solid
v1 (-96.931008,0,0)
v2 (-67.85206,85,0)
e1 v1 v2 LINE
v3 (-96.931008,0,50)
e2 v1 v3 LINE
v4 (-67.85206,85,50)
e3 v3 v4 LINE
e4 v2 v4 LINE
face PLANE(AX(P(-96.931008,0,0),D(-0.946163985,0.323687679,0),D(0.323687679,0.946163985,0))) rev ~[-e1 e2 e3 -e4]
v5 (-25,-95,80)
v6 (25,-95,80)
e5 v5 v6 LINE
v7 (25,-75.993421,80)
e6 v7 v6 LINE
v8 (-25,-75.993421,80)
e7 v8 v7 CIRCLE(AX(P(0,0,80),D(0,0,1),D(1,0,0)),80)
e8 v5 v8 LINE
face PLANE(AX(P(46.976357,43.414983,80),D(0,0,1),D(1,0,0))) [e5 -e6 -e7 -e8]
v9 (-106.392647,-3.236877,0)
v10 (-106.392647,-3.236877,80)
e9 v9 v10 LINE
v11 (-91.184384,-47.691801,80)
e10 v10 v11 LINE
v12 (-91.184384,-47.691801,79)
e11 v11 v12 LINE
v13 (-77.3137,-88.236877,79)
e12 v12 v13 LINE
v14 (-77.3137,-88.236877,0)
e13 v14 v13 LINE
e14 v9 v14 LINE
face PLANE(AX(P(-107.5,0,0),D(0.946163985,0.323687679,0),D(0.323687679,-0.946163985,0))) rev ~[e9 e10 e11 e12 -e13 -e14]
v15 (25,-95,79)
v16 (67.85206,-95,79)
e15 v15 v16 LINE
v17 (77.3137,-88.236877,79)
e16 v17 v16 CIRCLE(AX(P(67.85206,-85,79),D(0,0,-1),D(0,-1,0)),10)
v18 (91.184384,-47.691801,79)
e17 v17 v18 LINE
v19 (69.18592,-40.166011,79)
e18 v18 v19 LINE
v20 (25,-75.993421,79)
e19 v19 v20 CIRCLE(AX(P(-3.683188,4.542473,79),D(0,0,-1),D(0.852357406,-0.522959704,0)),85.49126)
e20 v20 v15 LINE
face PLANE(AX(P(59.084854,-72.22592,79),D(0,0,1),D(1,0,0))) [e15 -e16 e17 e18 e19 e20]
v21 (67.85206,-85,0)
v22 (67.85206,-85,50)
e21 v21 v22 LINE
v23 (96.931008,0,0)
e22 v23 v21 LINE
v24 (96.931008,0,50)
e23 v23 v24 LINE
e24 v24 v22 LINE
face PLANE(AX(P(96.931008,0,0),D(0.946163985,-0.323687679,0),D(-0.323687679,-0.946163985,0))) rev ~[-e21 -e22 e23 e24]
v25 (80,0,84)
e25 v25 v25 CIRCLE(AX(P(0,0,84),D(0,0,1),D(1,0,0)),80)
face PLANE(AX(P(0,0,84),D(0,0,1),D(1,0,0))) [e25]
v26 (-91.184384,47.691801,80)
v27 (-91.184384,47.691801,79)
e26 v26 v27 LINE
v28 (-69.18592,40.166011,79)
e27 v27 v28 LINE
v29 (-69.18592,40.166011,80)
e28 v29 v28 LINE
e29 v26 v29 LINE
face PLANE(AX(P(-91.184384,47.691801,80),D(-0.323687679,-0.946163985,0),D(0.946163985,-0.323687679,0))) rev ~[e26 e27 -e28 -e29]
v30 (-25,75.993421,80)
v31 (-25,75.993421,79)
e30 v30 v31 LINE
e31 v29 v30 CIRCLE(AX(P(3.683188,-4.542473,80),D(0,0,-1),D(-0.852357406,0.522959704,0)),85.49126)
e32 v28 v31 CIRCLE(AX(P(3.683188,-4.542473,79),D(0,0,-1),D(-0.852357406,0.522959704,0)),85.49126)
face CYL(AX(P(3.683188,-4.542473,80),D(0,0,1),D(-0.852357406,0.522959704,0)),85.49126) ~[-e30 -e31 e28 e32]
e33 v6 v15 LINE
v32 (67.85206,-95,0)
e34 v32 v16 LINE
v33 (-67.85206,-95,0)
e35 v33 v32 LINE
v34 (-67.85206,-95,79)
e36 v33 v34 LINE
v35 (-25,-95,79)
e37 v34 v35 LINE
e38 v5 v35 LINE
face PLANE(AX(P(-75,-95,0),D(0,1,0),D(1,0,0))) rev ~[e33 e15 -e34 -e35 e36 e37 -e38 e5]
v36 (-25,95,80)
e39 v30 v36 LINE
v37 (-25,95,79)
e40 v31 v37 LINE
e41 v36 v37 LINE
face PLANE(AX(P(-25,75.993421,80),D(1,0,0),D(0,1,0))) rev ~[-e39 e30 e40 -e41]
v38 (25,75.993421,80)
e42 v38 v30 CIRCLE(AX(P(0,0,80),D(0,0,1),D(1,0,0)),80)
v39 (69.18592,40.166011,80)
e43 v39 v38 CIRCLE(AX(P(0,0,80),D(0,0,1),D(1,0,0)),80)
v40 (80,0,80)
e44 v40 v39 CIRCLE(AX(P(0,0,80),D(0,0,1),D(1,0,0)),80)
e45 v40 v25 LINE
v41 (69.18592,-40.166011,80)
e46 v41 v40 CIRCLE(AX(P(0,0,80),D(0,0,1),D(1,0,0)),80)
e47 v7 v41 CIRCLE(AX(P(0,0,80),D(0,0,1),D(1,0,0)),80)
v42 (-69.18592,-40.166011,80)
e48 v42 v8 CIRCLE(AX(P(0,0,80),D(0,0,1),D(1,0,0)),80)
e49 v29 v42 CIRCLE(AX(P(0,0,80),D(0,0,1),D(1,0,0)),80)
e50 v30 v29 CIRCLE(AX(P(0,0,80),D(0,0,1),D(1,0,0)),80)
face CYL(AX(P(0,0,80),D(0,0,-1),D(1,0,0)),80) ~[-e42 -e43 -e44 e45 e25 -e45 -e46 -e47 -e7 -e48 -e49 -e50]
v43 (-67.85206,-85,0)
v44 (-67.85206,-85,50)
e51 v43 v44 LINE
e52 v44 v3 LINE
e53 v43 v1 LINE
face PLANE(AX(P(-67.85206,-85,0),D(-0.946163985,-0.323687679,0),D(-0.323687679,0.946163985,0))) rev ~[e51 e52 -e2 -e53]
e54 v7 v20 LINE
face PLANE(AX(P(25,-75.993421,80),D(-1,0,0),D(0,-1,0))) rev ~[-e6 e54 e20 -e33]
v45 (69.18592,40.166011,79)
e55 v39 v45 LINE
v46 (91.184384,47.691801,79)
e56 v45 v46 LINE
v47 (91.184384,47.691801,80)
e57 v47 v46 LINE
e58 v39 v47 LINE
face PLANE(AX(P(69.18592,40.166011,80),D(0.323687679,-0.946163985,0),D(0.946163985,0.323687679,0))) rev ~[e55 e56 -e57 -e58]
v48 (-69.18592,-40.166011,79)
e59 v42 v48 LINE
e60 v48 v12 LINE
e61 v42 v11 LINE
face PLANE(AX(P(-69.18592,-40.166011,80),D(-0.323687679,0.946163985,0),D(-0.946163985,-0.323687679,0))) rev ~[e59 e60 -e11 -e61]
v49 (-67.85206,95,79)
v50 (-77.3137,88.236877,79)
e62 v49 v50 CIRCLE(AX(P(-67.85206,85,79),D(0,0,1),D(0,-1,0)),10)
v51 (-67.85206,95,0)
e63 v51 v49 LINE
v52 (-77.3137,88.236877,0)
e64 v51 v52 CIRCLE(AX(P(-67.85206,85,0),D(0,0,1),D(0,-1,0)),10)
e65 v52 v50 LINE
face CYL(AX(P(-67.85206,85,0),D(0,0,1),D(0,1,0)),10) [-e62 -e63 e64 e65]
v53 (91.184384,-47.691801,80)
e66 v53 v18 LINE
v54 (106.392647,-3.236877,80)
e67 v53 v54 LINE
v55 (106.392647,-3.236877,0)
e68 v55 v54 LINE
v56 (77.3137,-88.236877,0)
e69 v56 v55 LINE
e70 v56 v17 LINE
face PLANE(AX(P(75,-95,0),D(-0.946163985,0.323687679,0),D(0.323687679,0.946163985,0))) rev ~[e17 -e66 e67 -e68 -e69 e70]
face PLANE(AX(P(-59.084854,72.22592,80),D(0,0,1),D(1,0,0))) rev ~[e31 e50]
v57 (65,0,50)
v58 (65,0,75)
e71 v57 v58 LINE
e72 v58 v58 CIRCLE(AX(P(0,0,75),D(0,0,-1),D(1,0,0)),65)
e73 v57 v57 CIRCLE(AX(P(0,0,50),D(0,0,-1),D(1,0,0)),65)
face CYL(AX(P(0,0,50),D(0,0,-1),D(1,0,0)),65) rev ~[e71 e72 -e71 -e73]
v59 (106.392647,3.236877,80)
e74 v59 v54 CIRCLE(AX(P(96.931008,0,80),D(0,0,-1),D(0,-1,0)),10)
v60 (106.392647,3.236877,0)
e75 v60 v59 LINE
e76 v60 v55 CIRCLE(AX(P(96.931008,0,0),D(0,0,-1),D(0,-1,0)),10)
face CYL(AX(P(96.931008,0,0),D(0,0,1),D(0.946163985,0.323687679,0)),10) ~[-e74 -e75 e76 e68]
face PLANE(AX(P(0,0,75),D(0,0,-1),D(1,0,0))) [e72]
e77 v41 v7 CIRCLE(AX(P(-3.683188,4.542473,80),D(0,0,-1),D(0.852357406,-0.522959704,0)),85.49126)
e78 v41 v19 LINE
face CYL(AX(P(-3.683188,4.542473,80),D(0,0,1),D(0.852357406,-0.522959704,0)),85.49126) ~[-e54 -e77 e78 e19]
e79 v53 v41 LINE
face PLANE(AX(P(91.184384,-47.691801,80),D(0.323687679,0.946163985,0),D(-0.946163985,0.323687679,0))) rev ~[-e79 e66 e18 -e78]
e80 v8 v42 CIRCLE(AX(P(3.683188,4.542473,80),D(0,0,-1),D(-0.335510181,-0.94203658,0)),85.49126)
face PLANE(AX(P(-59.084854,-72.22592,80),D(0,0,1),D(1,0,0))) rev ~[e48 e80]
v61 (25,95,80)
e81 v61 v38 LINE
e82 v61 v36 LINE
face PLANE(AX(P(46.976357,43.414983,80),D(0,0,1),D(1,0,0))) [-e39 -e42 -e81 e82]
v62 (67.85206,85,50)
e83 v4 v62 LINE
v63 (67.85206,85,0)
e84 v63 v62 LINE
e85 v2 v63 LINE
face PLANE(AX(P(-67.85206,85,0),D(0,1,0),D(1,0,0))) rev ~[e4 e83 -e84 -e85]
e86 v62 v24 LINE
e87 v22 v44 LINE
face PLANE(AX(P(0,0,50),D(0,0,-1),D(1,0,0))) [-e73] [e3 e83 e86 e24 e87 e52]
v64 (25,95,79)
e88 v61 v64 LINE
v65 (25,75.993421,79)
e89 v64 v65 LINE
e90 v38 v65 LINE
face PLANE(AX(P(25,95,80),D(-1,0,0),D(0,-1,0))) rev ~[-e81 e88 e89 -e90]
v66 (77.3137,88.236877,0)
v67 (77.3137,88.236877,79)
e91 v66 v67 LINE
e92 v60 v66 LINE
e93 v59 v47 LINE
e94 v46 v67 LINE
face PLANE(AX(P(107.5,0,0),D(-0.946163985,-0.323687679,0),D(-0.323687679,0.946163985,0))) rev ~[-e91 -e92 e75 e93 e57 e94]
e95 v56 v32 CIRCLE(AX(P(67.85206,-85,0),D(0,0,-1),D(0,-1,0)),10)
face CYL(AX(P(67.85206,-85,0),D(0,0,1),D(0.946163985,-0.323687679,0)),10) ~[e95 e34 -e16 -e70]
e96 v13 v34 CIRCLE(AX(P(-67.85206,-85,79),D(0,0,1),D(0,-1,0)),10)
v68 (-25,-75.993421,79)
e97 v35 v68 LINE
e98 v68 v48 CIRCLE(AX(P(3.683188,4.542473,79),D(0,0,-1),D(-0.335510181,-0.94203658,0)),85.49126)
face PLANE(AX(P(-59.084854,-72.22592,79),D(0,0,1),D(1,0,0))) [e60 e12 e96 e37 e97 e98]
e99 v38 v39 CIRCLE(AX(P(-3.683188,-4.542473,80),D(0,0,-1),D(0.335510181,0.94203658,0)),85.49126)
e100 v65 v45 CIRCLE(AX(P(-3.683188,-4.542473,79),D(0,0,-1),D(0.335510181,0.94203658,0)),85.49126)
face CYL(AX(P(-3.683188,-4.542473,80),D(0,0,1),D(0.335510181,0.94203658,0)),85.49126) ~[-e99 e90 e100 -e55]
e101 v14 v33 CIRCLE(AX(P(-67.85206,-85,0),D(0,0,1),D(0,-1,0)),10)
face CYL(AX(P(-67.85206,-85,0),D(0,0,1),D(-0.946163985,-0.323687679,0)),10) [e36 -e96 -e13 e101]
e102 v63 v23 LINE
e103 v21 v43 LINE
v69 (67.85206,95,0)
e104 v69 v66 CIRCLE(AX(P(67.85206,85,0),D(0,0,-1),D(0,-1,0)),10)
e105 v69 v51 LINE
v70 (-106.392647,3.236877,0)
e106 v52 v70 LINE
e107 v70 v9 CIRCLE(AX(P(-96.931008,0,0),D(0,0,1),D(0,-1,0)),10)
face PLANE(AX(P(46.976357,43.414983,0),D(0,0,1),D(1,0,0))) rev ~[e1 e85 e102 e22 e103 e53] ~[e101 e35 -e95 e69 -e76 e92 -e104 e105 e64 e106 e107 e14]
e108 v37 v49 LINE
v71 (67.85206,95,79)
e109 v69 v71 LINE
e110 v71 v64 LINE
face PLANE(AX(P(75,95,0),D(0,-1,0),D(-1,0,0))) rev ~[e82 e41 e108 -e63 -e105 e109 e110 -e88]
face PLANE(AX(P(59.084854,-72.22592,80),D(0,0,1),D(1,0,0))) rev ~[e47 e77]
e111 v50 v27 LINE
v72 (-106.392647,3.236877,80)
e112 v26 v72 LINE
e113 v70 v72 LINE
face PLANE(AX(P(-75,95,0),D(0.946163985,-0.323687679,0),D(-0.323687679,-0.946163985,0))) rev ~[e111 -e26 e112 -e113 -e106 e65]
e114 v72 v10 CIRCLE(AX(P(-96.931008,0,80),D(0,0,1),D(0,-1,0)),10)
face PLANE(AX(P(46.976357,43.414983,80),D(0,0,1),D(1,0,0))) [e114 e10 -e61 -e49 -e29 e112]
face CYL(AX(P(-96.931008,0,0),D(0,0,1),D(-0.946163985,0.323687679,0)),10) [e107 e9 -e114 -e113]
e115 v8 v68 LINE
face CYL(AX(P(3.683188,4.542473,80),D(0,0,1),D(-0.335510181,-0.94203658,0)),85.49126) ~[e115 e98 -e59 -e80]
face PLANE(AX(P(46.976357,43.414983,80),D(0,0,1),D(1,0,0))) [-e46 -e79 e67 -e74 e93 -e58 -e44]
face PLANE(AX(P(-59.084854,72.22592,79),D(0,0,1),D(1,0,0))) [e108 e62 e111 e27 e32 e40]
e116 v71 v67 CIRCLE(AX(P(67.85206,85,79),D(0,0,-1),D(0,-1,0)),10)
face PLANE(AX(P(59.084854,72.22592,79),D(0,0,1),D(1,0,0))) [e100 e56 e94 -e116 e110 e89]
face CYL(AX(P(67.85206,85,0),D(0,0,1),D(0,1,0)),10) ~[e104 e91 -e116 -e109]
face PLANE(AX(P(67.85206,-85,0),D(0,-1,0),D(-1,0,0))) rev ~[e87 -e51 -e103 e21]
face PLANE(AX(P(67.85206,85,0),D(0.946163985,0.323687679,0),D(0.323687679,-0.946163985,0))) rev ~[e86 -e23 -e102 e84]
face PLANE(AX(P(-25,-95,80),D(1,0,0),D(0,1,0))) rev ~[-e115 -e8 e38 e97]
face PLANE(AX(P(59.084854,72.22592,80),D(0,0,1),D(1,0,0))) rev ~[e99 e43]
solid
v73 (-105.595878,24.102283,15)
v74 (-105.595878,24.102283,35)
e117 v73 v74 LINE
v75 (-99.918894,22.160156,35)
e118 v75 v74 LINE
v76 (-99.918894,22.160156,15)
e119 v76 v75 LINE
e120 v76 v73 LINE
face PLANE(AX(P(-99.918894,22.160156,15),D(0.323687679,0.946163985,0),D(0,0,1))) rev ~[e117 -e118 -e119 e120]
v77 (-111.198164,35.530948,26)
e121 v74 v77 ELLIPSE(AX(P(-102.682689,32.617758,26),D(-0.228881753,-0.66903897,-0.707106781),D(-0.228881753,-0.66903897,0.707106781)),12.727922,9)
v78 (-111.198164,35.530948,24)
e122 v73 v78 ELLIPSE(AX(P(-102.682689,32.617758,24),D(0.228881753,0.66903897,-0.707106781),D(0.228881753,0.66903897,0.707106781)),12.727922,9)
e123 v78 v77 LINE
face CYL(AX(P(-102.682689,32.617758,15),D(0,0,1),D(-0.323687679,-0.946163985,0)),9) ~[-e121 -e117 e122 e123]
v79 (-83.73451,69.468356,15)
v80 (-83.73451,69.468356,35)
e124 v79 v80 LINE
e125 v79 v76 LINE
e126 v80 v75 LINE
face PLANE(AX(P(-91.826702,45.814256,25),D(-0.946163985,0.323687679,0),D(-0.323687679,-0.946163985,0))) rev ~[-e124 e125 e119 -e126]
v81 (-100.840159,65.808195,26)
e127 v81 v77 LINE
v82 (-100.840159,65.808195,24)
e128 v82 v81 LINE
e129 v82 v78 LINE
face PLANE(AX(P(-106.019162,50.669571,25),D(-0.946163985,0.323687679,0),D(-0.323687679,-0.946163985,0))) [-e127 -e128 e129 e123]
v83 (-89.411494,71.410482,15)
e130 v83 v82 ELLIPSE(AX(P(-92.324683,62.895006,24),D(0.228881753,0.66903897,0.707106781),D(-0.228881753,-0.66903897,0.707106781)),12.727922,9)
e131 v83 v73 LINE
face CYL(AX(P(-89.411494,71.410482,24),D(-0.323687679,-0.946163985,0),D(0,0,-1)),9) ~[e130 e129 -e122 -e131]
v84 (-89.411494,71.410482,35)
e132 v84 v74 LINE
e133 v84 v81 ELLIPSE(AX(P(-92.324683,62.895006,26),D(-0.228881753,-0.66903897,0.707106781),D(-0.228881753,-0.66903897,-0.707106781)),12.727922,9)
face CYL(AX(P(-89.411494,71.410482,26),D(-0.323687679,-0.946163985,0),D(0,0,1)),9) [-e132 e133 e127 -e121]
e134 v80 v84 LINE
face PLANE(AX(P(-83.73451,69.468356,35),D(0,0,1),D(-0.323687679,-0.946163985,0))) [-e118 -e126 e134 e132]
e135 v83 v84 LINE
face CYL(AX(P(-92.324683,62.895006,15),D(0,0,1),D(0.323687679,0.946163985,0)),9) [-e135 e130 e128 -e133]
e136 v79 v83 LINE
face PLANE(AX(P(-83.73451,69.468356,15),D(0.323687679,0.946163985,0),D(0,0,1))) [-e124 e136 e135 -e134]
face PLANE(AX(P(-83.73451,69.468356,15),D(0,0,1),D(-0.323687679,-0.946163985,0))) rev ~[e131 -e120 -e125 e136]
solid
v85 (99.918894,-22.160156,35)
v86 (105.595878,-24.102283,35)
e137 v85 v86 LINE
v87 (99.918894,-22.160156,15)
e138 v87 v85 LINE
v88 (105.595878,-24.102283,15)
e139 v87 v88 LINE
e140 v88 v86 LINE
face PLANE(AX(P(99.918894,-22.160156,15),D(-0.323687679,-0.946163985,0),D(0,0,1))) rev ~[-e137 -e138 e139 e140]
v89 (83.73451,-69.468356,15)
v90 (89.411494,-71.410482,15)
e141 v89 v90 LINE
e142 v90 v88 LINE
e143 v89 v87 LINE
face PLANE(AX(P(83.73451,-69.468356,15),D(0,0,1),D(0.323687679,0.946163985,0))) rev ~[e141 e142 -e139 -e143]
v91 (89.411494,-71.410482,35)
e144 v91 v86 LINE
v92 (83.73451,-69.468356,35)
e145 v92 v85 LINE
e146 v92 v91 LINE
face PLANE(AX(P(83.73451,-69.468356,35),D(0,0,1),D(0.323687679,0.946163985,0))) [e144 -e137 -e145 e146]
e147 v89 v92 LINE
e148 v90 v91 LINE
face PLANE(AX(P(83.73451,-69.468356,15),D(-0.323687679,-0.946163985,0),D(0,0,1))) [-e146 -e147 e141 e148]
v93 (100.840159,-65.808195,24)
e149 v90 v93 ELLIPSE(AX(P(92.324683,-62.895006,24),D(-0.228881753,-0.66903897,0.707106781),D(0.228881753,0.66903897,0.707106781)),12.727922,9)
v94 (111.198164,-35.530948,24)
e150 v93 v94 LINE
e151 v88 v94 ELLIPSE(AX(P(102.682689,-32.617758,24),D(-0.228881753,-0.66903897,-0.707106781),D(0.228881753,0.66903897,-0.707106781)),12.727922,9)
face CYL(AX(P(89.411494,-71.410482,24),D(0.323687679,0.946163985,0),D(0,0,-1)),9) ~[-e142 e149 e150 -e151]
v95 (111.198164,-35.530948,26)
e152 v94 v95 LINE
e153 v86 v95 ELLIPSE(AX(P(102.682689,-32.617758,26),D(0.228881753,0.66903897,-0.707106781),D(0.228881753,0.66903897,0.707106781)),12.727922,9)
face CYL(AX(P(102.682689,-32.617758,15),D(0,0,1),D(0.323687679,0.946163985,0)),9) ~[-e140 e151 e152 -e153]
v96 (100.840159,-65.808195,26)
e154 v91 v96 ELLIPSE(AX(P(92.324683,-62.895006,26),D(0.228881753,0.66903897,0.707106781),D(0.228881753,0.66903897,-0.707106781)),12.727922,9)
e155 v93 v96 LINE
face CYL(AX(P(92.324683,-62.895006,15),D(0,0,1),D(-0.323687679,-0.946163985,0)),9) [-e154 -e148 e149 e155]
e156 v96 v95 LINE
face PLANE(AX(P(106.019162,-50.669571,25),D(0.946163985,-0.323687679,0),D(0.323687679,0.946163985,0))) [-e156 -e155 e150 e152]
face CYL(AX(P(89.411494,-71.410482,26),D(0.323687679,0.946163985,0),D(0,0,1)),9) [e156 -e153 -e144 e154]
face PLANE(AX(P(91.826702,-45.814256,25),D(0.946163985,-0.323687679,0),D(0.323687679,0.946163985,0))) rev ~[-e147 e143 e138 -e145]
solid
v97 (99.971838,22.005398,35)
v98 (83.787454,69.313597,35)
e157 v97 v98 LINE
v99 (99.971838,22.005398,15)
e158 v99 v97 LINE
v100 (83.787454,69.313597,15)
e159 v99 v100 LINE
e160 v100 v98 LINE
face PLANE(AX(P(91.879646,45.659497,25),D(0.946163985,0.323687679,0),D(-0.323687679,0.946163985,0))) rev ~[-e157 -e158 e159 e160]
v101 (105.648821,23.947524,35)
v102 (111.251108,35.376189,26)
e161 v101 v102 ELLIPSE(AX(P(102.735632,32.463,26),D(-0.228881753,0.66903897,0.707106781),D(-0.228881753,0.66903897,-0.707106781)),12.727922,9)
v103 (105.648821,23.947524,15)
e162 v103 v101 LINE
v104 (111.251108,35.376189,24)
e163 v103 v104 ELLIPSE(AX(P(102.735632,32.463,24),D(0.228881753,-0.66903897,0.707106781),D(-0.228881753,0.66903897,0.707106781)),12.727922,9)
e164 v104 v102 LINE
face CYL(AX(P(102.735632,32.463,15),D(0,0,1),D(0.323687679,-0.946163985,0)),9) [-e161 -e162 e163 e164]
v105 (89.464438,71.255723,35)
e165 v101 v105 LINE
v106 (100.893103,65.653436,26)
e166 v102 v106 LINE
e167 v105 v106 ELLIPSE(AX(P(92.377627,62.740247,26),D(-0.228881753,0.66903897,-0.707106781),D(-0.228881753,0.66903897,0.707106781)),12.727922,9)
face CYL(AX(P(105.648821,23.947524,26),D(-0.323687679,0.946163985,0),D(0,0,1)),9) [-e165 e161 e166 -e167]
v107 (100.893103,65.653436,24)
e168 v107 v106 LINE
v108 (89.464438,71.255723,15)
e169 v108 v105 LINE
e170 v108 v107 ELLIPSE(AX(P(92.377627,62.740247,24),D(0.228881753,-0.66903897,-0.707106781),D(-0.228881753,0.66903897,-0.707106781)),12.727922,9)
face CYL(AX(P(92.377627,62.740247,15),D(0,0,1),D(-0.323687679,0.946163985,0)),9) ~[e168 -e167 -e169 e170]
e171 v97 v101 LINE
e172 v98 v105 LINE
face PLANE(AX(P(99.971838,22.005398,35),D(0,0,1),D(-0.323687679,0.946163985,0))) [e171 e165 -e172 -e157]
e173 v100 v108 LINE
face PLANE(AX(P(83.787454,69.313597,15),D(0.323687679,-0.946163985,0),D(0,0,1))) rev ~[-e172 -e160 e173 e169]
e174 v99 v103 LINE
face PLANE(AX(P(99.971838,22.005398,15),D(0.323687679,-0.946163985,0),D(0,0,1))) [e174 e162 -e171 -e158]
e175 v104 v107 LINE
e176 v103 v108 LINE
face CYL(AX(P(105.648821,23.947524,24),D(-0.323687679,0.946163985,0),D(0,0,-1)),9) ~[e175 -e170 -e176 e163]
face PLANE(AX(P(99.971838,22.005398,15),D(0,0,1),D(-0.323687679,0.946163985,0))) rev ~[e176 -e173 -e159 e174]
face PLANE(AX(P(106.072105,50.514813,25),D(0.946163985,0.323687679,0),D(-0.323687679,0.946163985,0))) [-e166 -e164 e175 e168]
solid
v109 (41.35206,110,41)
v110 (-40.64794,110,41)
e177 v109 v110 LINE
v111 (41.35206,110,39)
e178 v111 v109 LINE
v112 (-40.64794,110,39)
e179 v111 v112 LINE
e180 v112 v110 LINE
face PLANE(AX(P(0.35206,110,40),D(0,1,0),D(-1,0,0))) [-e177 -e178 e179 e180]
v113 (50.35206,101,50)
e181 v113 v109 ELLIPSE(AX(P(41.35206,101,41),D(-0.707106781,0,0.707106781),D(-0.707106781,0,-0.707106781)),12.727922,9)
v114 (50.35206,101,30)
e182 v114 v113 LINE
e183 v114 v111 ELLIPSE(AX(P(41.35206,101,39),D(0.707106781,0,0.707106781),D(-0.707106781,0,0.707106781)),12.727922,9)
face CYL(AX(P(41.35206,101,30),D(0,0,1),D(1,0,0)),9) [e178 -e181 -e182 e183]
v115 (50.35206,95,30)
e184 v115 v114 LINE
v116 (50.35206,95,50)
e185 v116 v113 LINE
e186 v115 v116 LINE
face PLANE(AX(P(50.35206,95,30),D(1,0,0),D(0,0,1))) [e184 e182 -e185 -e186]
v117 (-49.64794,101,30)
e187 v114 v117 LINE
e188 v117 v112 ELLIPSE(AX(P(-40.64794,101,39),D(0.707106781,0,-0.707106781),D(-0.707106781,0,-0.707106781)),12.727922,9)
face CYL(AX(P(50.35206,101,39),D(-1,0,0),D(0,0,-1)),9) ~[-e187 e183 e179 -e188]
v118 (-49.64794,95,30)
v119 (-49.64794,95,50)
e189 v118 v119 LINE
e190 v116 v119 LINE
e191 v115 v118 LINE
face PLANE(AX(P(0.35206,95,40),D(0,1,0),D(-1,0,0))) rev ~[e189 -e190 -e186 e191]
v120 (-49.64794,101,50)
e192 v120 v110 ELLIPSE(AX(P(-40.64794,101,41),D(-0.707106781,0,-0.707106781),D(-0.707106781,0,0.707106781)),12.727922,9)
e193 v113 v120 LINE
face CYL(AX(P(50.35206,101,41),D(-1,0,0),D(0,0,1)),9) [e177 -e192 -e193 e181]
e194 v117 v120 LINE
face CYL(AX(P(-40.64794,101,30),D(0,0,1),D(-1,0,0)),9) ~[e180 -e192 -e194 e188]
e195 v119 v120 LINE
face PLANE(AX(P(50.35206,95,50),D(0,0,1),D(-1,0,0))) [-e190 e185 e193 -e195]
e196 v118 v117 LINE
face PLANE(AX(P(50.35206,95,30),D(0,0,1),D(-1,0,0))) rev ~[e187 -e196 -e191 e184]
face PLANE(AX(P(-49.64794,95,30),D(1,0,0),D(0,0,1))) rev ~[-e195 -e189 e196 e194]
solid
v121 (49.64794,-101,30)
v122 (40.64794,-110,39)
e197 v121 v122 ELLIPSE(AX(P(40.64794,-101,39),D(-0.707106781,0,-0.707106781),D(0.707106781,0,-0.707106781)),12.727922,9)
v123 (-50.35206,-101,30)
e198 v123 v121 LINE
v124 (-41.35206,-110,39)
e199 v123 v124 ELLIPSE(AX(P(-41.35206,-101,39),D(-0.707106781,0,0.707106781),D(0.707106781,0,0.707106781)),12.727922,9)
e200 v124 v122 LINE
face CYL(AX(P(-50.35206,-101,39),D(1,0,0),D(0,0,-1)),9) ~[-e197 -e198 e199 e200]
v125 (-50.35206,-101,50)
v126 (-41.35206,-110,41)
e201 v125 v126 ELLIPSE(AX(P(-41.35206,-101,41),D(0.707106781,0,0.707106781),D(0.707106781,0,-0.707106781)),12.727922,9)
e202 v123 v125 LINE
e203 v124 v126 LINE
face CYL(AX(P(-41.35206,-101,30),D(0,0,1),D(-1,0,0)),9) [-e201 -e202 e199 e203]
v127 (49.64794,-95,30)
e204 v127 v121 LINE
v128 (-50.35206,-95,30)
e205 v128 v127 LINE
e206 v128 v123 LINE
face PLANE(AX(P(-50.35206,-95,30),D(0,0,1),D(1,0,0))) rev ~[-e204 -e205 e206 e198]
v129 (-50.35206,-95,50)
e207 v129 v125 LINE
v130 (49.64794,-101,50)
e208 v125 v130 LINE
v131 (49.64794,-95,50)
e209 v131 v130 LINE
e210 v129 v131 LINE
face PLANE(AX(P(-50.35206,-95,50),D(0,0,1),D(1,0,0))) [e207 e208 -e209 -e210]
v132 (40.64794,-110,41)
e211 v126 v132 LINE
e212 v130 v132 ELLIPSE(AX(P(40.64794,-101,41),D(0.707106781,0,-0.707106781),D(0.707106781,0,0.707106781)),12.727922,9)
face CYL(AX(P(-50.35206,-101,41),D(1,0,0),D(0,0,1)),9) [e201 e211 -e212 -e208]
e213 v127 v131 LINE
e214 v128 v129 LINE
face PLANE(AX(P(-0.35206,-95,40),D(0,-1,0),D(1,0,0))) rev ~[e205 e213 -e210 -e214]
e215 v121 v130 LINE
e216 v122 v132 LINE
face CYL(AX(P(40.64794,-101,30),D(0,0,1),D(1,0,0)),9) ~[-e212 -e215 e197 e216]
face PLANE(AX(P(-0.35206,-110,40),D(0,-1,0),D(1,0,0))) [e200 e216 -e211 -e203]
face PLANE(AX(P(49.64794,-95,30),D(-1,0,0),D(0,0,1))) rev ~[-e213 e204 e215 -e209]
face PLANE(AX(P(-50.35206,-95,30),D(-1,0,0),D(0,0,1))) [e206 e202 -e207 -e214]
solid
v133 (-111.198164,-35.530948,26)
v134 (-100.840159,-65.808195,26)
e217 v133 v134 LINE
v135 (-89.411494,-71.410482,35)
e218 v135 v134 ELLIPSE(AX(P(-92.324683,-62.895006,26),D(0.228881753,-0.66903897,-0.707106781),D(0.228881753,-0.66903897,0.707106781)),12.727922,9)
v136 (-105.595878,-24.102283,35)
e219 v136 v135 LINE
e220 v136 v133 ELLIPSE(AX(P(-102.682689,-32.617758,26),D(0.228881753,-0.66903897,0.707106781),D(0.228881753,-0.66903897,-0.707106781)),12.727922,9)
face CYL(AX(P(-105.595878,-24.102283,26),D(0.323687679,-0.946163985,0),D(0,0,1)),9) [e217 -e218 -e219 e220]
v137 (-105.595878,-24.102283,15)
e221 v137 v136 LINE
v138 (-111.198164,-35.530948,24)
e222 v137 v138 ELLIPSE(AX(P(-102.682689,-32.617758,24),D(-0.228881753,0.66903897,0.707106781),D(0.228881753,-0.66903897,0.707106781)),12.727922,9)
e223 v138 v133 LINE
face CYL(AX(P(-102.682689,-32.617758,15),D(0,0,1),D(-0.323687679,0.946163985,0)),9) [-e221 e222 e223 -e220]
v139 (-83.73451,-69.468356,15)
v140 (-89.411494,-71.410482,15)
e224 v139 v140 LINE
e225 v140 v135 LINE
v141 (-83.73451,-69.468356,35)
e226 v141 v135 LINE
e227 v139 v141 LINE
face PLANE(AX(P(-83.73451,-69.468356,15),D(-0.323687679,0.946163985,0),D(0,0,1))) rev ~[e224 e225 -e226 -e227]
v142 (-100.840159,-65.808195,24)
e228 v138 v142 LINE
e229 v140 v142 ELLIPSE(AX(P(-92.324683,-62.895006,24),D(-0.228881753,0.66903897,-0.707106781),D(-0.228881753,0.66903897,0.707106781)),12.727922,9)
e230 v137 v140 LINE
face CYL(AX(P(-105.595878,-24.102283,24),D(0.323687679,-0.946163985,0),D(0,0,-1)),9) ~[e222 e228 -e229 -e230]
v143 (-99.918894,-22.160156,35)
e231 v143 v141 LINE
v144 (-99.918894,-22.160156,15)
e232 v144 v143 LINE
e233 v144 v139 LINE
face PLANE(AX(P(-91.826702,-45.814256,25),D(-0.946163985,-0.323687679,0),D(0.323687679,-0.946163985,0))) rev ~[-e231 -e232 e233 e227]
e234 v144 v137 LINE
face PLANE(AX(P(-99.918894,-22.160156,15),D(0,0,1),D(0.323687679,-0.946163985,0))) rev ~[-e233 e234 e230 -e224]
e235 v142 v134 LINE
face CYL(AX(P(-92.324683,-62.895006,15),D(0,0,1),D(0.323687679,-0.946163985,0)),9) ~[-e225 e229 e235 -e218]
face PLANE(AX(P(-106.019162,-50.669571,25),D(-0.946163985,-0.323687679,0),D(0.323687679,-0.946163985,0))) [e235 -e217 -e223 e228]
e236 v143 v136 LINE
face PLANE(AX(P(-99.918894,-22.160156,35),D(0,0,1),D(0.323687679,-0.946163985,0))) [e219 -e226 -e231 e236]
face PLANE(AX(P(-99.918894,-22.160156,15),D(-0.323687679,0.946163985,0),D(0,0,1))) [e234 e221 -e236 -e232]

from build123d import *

# Parameters (mm, degrees)
F1_DEPTH  = 80
F4_R      = 80
F5_DEPTH  = 4
F7_DEPTH  = 50
F8_R      = 65
F9_DEPTH  = 25
F11_DEPTH = 1
F13_R     = 10
F15_W     = 50
F15_H     = 20
F16_DEPTH = 15
F14_W     = 50
F14_H     = 20
F17_DEPTH = 15
F18_W     = 50
F18_H     = 20
F19_DEPTH = 15
F20_W     = 50
F20_H     = 20
F21_DEPTH = 15
F22_W     = 100
F22_H     = 20
F23_DEPTH = 15
F24_W     = 100
F24_H     = 20
F25_DEPTH = 15
F26_R     = 9
F26_2_R   = 9
F26_3_R   = 9
F26_4_R   = 9
F26_5_R   = 9
F26_6_R   = 9


# Not quite as in the source:
# - the program builds the solid bodies; features that only make, move or delete a surface that nothing else refers to are left out


with BuildPart() as f1:
    # F0 (on Top) → F1 (new body)
    with BuildSketch(Plane.XY):
        Polygon((75, 95), (0, 95), (0, 0), (107.5, 0), align=None)
        Polygon((0, 0), (0, 95), (-75, 95), (-107.5, 0), align=None)
        Polygon((107.5, 0), (0, 0), (0, -95), (75, -95), align=None)
        Polygon((0, -95), (0, 0), (-107.5, 0), (-75, -95), align=None)
    extrude(amount=F1_DEPTH)

    # F4 (on face) → F5 (join)
    with BuildSketch(Plane.XY.offset(80)):
        Circle(F4_R)
    extrude(amount=F5_DEPTH)

    # F6 (on face) → F7 (cut)
    with BuildSketch(Plane(origin=(0, 0, 0), x_dir=(1, 0, 0), z_dir=(0, 0, -1))):
        Polygon((67.8520601958, 85), (-67.8520601958, 85), (-96.9310075642, 0), (-67.8520601958, -85), (67.8520601958, -85), (96.9310075642, 0), align=None)
    extrude(amount=-F7_DEPTH, mode=Mode.SUBTRACT)

    # F8 (on face) → F9 (cut)
    with BuildSketch(Plane(origin=(0, 0, 50), x_dir=(1, 0, 0), z_dir=(0, 0, -1))):
        Circle(F8_R)
    extrude(amount=-F9_DEPTH, mode=Mode.SUBTRACT)

    # F10 (on face) → F11 (cut)
    with BuildSketch(Plane.XY.offset(80)):
        with BuildLine():
            Line((25, -95), (75, -95))
            Line((75, -95), (91.1843839531, -47.6918007523))
            Line((91.1843839531, -47.6918007523), (69.1859204708, -40.1660106136))
            ThreePointArc((69.1859204708, -40.1660106136), (50.1602708255, -61.8626277464), (25, -75.9934207679))
            Line((25, -75.9934207679), (25, -95))
        make_face()
        with BuildLine():
            Line((91.1843839531, 47.6918007523), (75, 95))
            Line((75, 95), (25, 95))
            Line((25, 95), (25, 75.9934207679))
            ThreePointArc((25, 75.9934207679), (50.1602708255, 61.8626277464), (69.1859204708, 40.1660106136))
            Line((69.1859204708, 40.1660106136), (91.1843839531, 47.6918007523))
        make_face()
        with BuildLine():
            Line((-25, 95), (-75, 95))
            Line((-75, 95), (-91.1843839531, 47.6918007523))
            Line((-91.1843839531, 47.6918007523), (-69.1859204708, 40.1660106136))
            ThreePointArc((-69.1859204708, 40.1660106136), (-50.1602708255, 61.8626277464), (-25, 75.9934207679))
            Line((-25, 75.9934207679), (-25, 95))
        make_face()
        with BuildLine():
            ThreePointArc((-25, -75.9934207679), (-50.1602708255, -61.8626277464), (-69.1859204708, -40.1660106136))
            Line((-69.1859204708, -40.1660106136), (-91.1843839531, -47.6918007523))
            Line((-91.1843839531, -47.6918007523), (-75, -95))
            Line((-75, -95), (-25, -95))
            Line((-25, -95), (-25, -75.9934207679))
        make_face()
    extrude(amount=-F11_DEPTH, mode=Mode.SUBTRACT)

    # F13
    f13_edges = [f1.edges().sort_by_distance(p)[0] for p in [
        (-75, -95, 39.5),
        (75, -95, 39.5),
        (107.5, 0, 40),
        (75, 95, 39.5),
        (-75, 95, 39.5),
        (-107.5, 0, 40),
    ]]
    fillet(f13_edges, radius=F13_R)


with BuildPart() as f16:
    # F15 (on face) → F16 (new body)
    with BuildSketch(Plane(origin=(-96.2368257905, 32.9231246125, 0), x_dir=(-0.3236876791, -0.946163985, 0), z_dir=(-0.946163985, 0.3236876791, 0))):
        with Locations((-13.6246271323, 25)):
            Rectangle(F15_W, F15_H)
    extrude(amount=F16_DEPTH)

    # F26#4
    f26_4_edges = [f16.edges().sort_by_distance(p)[0] for p in [
        (-114.111354, 27.015472, 25),
        (-106.019162, 50.669571, 35),
        (-97.92697, 74.323671, 25),
        (-106.019162, 50.669571, 15),
    ]]
    fillet(f26_4_edges, radius=F26_4_R)


with BuildPart() as f17:
    # F14 (on face) → F17 (new body)
    with BuildSketch(Plane(origin=(-96.2368257905, -32.9231246125, 0), x_dir=(0.3236876791, -0.946163985, 0), z_dir=(-0.946163985, -0.3236876791, 0))):
        with Locations((13.6246271323, 25)):
            Rectangle(F14_W, F14_H)
    extrude(amount=F17_DEPTH)

    # F26#3
    f26_3_edges = [f17.edges().sort_by_distance(p)[0] for p in [
        (-106.019162, -50.669571, 35),
        (-97.92697, -74.323671, 25),
        (-106.019162, -50.669571, 15),
        (-114.111354, -27.015472, 25),
    ]]
    fillet(f26_3_edges, radius=F26_3_R)


with BuildPart() as f19:
    # F18 (on face) → F19 (new body)
    with BuildSketch(Plane(origin=(96.2368257905, 32.9231246125, 0), x_dir=(-0.3236876791, 0.946163985, 0), z_dir=(0.946163985, 0.3236876791, 0))):
        with Locations((13.4610628366, 25)):
            Rectangle(F18_W, F18_H)
    extrude(amount=F19_DEPTH)

    # F26#2
    f26_2_edges = [f19.edges().sort_by_distance(p)[0] for p in [
        (106.072105, 50.514813, 35),
        (114.164297, 26.860713, 25),
        (106.072105, 50.514813, 15),
        (97.979913, 74.168912, 25),
    ]]
    fillet(f26_2_edges, radius=F26_2_R)


with BuildPart() as f21:
    # F20 (on face) → F21 (new body)
    with BuildSketch(Plane(origin=(96.2368257905, -32.9231246125, 0), x_dir=(0.3236876791, 0.946163985, 0), z_dir=(0.946163985, -0.3236876791, 0))):
        with Locations((-13.6246271323, 25)):
            Rectangle(F20_W, F20_H)
    extrude(amount=F21_DEPTH)

    # F26
    f26_edges = [f21.edges().sort_by_distance(p)[0] for p in [
        (106.019162, -50.669571, 35),
        (97.92697, -74.323671, 25),
        (106.019162, -50.669571, 15),
        (114.111354, -27.015472, 25),
    ]]
    fillet(f26_edges, radius=F26_R)


with BuildPart() as f23:
    # F22 (on face) → F23 (new body)
    with BuildSketch(Plane(origin=(0, 95, 0), x_dir=(-1, 0, 0), z_dir=(0, 1, 0))):
        with Locations((-0.3520601958, 40)):
            Rectangle(F22_W, F22_H)
    extrude(amount=F23_DEPTH)

    # F26#5
    f26_5_edges = [f23.edges().sort_by_distance(p)[0] for p in [
        (0.35206, 110, 50),
        (50.35206, 110, 40),
        (0.35206, 110, 30),
        (-49.64794, 110, 40),
    ]]
    fillet(f26_5_edges, radius=F26_5_R)


with BuildPart() as f25:
    # F24 (on face) → F25 (new body)
    with BuildSketch(Plane.XZ.offset(95)):
        with Locations((-0.3520601958, 40)):
            Rectangle(F24_W, F24_H)
    extrude(amount=F25_DEPTH)

    # F26#6
    f26_6_edges = [f25.edges().sort_by_distance(p)[0] for p in [
        (-0.35206, -110, 30),
        (49.64794, -110, 40),
        (-0.35206, -110, 50),
        (-50.35206, -110, 40),
    ]]
    fillet(f26_6_edges, radius=F26_6_R)


solid = Compound([f1.part, f16.part, f17.part, f19.part, f21.part, f23.part, f25.part])
